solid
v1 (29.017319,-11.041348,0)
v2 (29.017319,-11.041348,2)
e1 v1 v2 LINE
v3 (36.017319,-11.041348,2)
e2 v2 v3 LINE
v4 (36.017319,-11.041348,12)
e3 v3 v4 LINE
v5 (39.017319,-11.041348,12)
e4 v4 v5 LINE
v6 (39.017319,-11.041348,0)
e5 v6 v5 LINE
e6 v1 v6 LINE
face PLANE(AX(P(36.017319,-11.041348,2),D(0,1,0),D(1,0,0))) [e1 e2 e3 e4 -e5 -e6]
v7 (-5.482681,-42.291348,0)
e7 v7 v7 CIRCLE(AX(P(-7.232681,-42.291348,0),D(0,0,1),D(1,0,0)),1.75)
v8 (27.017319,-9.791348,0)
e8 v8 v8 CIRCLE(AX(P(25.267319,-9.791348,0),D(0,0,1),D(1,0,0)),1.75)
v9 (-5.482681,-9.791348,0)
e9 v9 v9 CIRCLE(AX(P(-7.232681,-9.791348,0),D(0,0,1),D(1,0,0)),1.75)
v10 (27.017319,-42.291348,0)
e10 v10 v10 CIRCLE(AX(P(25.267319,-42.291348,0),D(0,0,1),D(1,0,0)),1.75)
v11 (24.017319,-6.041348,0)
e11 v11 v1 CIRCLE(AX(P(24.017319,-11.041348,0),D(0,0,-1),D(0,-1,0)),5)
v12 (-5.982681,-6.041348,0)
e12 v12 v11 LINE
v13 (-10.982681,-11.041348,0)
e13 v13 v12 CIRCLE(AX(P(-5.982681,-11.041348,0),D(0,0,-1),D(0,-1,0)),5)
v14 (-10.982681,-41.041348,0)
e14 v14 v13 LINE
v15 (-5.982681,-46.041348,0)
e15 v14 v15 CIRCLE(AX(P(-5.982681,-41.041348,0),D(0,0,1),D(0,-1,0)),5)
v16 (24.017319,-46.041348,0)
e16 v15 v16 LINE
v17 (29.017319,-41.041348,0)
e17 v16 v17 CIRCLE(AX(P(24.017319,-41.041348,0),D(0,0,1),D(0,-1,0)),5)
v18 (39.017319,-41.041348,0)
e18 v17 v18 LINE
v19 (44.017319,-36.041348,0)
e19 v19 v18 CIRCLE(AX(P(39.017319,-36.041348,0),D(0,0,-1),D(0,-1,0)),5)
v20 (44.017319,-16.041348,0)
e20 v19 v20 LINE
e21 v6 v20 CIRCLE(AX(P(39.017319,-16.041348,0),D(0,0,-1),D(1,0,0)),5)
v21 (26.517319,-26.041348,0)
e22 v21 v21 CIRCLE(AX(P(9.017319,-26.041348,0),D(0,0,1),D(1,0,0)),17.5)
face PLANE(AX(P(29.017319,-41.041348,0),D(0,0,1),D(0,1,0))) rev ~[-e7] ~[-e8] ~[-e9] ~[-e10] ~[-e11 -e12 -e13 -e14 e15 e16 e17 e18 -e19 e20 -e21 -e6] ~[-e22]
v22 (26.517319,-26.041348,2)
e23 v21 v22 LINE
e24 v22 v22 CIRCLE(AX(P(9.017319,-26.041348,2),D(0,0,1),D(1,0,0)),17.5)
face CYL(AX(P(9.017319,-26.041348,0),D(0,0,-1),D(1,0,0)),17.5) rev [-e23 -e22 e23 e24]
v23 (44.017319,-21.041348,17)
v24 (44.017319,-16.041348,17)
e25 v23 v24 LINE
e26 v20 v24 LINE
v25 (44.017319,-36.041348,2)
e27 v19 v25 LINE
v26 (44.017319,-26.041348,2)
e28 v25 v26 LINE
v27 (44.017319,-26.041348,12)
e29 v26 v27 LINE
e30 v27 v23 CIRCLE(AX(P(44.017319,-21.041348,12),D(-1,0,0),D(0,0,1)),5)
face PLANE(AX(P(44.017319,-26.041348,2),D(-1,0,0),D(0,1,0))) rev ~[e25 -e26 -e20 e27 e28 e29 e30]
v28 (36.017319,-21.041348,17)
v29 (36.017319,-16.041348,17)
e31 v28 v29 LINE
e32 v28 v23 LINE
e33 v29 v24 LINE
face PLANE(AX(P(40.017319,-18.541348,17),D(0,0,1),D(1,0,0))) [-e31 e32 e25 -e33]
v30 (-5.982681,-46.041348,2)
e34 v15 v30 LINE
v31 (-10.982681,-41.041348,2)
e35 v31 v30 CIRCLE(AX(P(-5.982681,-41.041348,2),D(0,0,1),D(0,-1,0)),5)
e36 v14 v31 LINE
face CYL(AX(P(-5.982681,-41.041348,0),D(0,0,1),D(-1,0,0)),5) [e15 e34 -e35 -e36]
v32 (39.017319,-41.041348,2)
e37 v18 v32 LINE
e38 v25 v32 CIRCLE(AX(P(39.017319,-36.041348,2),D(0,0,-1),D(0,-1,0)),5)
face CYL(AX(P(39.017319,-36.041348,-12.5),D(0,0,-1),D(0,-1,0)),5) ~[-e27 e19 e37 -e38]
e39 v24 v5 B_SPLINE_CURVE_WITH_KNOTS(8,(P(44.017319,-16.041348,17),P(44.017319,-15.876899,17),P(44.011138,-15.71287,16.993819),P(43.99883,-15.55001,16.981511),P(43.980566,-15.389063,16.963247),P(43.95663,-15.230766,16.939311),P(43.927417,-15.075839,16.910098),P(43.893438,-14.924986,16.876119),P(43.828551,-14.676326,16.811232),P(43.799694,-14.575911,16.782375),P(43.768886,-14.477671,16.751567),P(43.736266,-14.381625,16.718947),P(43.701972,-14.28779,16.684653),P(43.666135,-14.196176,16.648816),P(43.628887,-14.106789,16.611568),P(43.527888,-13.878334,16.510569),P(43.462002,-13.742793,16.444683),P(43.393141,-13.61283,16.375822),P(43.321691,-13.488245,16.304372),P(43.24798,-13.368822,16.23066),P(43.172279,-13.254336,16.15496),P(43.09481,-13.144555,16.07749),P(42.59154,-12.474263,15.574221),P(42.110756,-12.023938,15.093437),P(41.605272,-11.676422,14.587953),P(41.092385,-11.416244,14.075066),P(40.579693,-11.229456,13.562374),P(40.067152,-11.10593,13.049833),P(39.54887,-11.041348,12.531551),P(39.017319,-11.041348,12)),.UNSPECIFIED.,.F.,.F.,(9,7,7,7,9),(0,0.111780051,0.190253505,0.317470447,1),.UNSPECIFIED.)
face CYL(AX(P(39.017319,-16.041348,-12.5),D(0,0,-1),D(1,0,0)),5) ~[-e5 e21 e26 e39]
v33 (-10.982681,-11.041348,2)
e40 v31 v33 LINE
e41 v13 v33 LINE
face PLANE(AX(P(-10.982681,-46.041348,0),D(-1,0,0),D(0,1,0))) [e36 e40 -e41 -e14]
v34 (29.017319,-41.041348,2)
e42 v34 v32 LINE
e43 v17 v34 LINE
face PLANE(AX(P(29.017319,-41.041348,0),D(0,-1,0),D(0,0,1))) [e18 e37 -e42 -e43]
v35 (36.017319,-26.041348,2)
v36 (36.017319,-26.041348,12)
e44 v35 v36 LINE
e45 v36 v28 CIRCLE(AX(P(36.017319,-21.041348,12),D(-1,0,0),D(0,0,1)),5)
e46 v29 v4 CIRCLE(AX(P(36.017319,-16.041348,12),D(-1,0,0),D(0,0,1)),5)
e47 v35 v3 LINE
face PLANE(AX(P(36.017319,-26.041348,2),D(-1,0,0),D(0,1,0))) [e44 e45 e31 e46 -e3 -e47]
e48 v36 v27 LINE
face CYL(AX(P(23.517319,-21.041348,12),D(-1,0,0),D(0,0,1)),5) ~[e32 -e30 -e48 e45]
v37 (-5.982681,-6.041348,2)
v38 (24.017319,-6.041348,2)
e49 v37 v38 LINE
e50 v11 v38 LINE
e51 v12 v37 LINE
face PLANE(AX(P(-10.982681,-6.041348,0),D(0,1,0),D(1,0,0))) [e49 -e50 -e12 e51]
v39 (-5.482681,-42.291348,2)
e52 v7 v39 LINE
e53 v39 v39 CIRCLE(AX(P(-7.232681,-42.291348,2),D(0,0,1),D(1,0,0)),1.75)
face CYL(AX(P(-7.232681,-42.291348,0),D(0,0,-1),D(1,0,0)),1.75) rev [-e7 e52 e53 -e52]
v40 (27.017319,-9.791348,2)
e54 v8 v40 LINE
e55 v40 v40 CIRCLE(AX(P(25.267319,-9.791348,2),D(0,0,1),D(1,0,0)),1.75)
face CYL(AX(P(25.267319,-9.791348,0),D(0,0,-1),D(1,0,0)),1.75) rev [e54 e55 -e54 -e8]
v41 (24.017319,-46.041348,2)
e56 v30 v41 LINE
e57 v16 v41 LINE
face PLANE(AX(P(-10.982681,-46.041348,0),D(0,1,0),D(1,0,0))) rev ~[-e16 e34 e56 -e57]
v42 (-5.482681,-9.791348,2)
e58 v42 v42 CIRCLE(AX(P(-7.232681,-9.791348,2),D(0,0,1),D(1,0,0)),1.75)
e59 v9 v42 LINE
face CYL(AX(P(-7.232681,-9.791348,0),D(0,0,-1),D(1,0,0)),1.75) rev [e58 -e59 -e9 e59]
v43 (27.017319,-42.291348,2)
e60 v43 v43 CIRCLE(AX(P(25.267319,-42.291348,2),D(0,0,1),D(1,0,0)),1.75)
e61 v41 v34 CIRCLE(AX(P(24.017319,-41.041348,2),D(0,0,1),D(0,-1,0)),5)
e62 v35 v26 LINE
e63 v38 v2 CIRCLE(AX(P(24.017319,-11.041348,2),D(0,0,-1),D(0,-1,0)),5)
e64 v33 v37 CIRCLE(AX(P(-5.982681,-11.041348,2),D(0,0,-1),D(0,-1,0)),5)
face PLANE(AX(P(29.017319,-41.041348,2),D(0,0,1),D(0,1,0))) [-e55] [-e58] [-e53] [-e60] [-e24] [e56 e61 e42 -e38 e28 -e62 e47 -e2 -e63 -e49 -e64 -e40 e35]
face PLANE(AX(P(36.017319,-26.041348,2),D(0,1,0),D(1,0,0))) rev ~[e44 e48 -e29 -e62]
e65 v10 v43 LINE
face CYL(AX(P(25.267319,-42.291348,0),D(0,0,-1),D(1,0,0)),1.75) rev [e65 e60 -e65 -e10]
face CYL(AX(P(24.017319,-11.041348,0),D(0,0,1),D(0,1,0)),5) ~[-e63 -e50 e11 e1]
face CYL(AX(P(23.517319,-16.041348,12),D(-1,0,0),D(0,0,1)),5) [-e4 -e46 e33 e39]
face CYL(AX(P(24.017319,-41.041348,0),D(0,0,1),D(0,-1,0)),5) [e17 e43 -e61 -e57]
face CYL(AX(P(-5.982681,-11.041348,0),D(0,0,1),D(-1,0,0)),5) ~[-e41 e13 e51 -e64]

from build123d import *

# Parameters (mm, degrees)
F0_W        = 40
F0_H        = 40
F0_R        = 1.75
F0_R_2      = 17.5
F1_DEPTH    = 2
F2_R        = 5
F3_DEPTH    = 15
F4_W        = 8
F4_H        = 15
F5_DEPTH    = 15
F6_T1_DEPTH = 33
F6_T3_DEPTH = 42
F6_T5_DEPTH = 27


# Not quite as in the source:
# - a fillet or chamfer that OpenCascade refuses, or shapes differently, is made with other operations: its cross-section is extruded or revolved along the edge and cut away or added


with BuildPart() as f1:
    # F0 (on Top) → F1 (new body)
    with BuildSketch(Plane.XY):
        with Locations((9.0173190544, -26.0413483679)):
            Rectangle(F0_W, F0_H)
        with Locations((-7.2326809456, -42.2913483679)):
            Circle(F0_R, mode=Mode.SUBTRACT)
        with Locations((25.2673190544, -42.2913483679)):
            Circle(F0_R, mode=Mode.SUBTRACT)
        with Locations((9.0173190544, -26.0413483679)):
            Circle(F0_R_2, mode=Mode.SUBTRACT)
        with Locations((-7.2326809456, -9.7913483679)):
            Circle(F0_R, mode=Mode.SUBTRACT)
        with Locations((25.2673190544, -9.7913483679)):
            Circle(F0_R, mode=Mode.SUBTRACT)
    extrude(amount=F1_DEPTH)

    # F2
    f2_edges = [f1.edges().sort_by_distance(p)[0] for p in [
        (29.017319, -46.041348, 1),
        (29.017319, -6.041348, 1),
        (-10.982681, -46.041348, 1),
        (-10.982681, -6.041348, 1),
    ]]
    fillet(f2_edges, radius=F2_R)

    # F3 (add): a face of the model
    f3_faces = [f1.faces().sort_by_distance(p)[0] for p in [
        (29.0173190544, -26.0413483679, 1),
    ]]
    extrude(f3_faces, amount=F3_DEPTH)

    # F4 (on face) → F5 (join)
    with BuildSketch(Plane.XY.offset(2)):
        with Locations((40.0173190544, -18.5413483679)):
            Rectangle(F4_W, F4_H)
    extrude(amount=F5_DEPTH)

    # F6: fillet of radius 5 on 5 edges, made by hand

    # F6_s2 → F6_t1 (cut)
    with BuildSketch(Plane.YZ.offset(23.5173190544)):
        with BuildLine():
            ThreePointArc((-21.0413483679, 17), (-24.5768822739, 15.5355339059), (-26.0413483679, 12))
            Line((-26.0413483679, 12), (-26.0413483679, 17))
            Line((-26.0413483679, 17), (-21.0413483679, 17))
        make_face()
        with BuildLine():
            ThreePointArc((-16.0413483679, 17), (-12.505814462, 15.5355339059), (-11.0413483679, 12))
            Line((-11.0413483679, 12), (-11.0413483679, 17))
            Line((-11.0413483679, 17), (-16.0413483679, 17))
        make_face()
    extrude(amount=F6_T1_DEPTH, mode=Mode.SUBTRACT)

    # F6_s4 → F6_t3 (cut)
    with BuildSketch(Plane.XY.offset(-12.5)):
        with BuildLine():
            ThreePointArc((44.0173190544, -16.0413483679), (42.5528529604, -12.505814462), (39.0173190544, -11.0413483679))
            Line((39.0173190544, -11.0413483679), (44.0173190544, -11.0413483679))
            Line((44.0173190544, -11.0413483679), (44.0173190544, -16.0413483679))
        make_face()
    extrude(amount=F6_T3_DEPTH, mode=Mode.SUBTRACT)

    # F6_s6 → F6_t5 (cut)
    with BuildSketch(Plane.XY.offset(-12.5)):
        with BuildLine():
            ThreePointArc((39.0173190544, -41.0413483679), (42.5528529604, -39.5768822739), (44.0173190544, -36.0413483679))
            Line((44.0173190544, -36.0413483679), (44.0173190544, -41.0413483679))
            Line((44.0173190544, -41.0413483679), (39.0173190544, -41.0413483679))
        make_face()
    extrude(amount=F6_T5_DEPTH, mode=Mode.SUBTRACT)


solid = f1.part
